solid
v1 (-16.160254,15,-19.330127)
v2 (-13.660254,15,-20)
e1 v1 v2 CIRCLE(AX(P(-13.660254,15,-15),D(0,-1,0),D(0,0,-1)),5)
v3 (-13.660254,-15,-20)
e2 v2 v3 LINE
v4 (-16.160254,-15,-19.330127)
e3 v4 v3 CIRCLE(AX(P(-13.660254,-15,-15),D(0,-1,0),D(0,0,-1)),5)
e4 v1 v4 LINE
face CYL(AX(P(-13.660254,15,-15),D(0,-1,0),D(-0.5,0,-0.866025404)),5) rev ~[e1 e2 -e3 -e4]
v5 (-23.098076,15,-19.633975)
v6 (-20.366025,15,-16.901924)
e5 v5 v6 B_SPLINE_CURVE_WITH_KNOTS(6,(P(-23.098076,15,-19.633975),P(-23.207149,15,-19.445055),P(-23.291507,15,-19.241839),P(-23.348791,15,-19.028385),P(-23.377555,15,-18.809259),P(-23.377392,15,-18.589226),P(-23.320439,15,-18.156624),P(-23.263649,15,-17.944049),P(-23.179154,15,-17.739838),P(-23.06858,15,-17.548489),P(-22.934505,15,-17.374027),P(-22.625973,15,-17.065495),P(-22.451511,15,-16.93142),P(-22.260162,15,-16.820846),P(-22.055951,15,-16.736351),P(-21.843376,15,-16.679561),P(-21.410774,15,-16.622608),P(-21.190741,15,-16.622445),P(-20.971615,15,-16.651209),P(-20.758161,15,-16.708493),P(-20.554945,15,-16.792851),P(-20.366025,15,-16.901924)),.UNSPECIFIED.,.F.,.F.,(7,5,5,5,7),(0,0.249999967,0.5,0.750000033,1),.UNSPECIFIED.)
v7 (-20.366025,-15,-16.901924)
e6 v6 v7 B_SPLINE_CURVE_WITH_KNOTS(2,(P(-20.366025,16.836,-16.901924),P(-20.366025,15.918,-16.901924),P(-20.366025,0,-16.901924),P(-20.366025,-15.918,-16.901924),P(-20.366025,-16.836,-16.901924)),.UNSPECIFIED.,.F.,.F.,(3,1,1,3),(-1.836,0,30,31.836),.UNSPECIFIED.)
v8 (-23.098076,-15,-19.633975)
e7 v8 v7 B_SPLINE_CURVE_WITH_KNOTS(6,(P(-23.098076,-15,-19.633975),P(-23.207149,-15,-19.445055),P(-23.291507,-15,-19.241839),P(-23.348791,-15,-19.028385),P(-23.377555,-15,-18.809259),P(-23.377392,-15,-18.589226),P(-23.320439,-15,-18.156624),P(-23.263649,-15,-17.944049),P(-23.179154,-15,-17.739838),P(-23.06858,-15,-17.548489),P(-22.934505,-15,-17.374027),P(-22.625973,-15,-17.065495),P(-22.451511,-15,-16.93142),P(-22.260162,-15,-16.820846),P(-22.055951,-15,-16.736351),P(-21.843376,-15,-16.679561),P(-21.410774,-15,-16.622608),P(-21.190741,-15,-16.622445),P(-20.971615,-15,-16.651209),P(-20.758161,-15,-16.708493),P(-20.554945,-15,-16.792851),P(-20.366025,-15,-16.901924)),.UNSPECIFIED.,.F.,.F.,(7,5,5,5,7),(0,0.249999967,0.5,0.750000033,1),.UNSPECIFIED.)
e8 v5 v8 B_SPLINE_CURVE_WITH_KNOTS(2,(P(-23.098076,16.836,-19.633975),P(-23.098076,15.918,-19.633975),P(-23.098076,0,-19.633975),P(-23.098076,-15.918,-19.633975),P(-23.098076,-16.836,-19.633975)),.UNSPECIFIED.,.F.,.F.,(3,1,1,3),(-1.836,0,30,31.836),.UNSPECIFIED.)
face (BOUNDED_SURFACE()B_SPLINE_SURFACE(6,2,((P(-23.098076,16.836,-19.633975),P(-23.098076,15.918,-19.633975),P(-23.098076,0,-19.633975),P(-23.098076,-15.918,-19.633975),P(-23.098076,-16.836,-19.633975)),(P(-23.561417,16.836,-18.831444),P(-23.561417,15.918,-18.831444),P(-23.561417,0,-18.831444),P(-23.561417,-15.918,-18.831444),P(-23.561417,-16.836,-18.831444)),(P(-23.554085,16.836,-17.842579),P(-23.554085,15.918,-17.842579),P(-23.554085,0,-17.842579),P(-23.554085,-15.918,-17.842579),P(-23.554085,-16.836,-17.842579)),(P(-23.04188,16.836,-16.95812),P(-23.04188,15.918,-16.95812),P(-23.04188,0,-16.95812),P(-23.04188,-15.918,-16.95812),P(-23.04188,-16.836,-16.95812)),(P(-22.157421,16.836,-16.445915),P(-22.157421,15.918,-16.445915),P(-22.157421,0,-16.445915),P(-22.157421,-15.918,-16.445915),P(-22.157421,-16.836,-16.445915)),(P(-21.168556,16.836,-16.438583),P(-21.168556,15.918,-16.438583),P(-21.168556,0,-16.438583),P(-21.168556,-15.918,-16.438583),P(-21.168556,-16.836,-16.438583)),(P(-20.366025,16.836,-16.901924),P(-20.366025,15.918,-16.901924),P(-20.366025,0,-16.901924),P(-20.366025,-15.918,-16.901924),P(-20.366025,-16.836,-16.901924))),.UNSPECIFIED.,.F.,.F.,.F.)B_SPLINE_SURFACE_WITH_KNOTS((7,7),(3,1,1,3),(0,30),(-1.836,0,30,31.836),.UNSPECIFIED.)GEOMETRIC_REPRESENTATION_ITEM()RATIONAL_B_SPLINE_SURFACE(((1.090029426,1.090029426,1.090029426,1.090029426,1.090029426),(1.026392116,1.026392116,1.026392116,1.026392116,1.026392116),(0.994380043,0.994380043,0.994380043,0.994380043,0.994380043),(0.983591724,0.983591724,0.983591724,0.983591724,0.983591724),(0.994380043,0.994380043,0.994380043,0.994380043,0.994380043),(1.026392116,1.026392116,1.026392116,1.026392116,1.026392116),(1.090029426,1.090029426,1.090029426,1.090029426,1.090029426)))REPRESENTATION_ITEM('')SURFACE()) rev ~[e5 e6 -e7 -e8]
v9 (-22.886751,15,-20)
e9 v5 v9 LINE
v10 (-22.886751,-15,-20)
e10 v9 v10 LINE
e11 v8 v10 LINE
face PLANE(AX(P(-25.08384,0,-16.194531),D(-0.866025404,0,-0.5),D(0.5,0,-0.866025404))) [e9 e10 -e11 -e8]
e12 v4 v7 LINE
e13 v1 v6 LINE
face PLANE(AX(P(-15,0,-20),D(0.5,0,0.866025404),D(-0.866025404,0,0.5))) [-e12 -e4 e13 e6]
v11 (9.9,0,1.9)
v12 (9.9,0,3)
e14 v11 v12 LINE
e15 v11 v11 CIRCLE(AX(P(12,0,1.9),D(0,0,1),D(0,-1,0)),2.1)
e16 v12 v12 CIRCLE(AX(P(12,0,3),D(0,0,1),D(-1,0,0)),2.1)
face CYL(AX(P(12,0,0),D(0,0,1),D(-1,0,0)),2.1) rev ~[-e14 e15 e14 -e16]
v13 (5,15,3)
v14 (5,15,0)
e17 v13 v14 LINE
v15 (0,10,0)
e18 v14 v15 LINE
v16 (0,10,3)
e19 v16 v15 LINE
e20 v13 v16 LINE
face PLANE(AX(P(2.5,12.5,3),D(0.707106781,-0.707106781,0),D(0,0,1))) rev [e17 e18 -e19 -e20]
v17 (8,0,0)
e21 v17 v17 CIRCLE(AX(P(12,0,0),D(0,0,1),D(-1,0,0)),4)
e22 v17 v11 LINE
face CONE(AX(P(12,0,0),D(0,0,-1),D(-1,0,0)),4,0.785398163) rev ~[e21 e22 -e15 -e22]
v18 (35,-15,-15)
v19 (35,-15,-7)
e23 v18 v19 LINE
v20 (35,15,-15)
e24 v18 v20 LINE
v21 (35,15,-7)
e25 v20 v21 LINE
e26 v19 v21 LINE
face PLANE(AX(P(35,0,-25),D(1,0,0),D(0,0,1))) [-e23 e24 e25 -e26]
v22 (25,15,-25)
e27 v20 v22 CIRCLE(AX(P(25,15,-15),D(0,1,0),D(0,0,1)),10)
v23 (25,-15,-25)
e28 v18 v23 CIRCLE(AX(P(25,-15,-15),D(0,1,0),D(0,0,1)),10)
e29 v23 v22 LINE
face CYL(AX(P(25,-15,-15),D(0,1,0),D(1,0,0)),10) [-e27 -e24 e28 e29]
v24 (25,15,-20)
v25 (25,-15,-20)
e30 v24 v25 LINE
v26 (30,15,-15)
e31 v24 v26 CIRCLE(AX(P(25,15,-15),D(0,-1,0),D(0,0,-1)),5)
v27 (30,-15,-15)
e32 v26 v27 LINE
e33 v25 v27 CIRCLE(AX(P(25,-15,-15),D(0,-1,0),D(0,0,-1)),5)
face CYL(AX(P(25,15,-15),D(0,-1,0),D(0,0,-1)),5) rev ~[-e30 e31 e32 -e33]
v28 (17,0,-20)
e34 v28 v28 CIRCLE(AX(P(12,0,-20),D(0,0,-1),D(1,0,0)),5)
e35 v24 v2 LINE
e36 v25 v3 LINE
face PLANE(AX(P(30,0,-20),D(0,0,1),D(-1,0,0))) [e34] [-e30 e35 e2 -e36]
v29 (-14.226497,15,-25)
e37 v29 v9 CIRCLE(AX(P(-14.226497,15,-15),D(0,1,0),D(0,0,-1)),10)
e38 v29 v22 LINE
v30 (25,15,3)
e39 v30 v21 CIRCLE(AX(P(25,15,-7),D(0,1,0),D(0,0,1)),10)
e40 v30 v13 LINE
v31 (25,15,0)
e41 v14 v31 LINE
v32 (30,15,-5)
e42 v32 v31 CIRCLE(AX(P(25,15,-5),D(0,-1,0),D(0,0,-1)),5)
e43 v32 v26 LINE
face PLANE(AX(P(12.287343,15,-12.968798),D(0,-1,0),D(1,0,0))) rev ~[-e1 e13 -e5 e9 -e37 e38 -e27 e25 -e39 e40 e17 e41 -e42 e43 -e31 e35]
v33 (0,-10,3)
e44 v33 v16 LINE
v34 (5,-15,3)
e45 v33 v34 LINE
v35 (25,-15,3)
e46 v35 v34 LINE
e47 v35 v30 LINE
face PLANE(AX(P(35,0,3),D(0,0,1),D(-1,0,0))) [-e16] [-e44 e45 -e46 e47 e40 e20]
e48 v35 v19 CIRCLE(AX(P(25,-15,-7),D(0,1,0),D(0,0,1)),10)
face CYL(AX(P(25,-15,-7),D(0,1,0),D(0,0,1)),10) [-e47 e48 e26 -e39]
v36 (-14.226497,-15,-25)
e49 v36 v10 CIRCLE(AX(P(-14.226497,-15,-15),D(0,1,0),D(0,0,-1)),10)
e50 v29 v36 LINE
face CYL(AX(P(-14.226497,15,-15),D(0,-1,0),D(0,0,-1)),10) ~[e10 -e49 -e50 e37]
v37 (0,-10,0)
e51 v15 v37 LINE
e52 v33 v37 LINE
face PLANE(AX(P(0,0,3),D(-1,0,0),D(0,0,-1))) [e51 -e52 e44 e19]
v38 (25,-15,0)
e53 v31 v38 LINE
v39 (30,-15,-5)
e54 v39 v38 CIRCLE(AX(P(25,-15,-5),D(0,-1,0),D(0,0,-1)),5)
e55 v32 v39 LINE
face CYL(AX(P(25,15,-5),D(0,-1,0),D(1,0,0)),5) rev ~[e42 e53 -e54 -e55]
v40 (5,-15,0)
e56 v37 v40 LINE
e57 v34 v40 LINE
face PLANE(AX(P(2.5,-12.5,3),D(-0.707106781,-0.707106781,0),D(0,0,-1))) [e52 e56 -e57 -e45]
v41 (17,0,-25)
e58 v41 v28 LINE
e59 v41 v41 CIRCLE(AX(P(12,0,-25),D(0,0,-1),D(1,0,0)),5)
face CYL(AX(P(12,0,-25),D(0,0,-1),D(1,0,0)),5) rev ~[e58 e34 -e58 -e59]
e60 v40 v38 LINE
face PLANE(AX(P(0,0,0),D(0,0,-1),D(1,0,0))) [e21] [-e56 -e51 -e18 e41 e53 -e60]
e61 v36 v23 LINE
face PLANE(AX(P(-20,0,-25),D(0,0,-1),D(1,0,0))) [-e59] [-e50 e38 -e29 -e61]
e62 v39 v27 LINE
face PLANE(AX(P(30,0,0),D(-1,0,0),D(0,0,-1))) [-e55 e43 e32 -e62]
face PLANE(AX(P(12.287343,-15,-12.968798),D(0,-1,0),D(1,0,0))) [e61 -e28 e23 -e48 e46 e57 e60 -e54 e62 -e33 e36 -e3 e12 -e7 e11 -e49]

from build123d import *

# Parameters (mm, degrees)
F1_DEPTH       = 15
F2_R           = 5
F3_R           = 10
F5_D           = 4.2
F5_CSINK_D     = 8
F5_CSINK_ANGLE = 90
F6_R           = 5
F7_DEPTH       = 5
F8_T1_DEPTH    = 47.7203429425
F9_R           = 2
F10_SIZE       = 5


# Not quite as in the source:
# - a fillet or chamfer that OpenCascade refuses, or shapes differently, is made with other operations: its cross-section is extruded or revolved along the edge and cut away or added


with BuildPart() as f1:
    # F0 (on Front) → F1 (new body, symmetric)
    with BuildSketch(Plane.XZ):
        Polygon((0, 3), (0, 0), (30, 0), (30, -20), (-15, -20), (-23.6602540378, -15), (-25.0838401426, -16.1945305755), (-20, -25), (35, -25), (35, 3), align=None)
    extrude(amount=F1_DEPTH, both=True)

    # F2
    f2_edges = [f1.edges().sort_by_distance(p)[0] for p in [
        (30, 0, 0),
        (30, 0, -20),
        (-15, 0, -20),
    ]]
    fillet(f2_edges, radius=F2_R)

    # F3
    f3_edges = [f1.edges().sort_by_distance(p)[0] for p in [
        (35, 0, 3),
        (35, 0, -25),
        (-20, 0, -25),
    ]]
    fillet(f3_edges, radius=F3_R)

    # F5 (through all)
    with Locations(Plane(origin=(0, 0, 0), x_dir=(1, 0, 0), z_dir=(0, 0, -1))):
        with Locations((12, 0)):
            CounterSinkHole(F5_D / 2, F5_CSINK_D / 2, counter_sink_angle=F5_CSINK_ANGLE)

    # F6 (on face) → F7 (cut, through all)
    with BuildSketch(Plane(origin=(0, 0, -25), x_dir=(1, 0, 0), z_dir=(0, 0, -1))):
        with Locations((12, 0)):
            Circle(F6_R)
    extrude(amount=-F7_DEPTH, mode=Mode.SUBTRACT)

    # F8: fillet of radius 5 on 1 edges, made by hand

    # F8_s2 → F8_t1 (cut)
    with BuildSketch(Plane.XZ.offset(-23.8601714713)):
        with BuildLine():
            ThreePointArc((-23.3118058484, -19.2637840059), (-23.9650654758, -17.171040108), (-23.6602540378, -15))
            Line((-23.6602540378, -15), (-25.0838401426, -16.1945305755))
            Line((-25.0838401426, -16.1945305755), (-23.3118058484, -19.2637840059))
        make_face()
    extrude(amount=F8_T1_DEPTH, mode=Mode.SUBTRACT)

    # F9
    f9_edges = [f1.edges().sort_by_distance(p)[0] for p in [
        (-23.660254, 0, -15),
    ]]
    fillet(f9_edges, radius=F9_R)

    # F10
    f10_edges = [f1.edges().sort_by_distance(p)[0] for p in [
        (0, 15, 1.5),
        (0, -15, 1.5),
    ]]
    chamfer(f10_edges, length=F10_SIZE)


solid = f1.part
